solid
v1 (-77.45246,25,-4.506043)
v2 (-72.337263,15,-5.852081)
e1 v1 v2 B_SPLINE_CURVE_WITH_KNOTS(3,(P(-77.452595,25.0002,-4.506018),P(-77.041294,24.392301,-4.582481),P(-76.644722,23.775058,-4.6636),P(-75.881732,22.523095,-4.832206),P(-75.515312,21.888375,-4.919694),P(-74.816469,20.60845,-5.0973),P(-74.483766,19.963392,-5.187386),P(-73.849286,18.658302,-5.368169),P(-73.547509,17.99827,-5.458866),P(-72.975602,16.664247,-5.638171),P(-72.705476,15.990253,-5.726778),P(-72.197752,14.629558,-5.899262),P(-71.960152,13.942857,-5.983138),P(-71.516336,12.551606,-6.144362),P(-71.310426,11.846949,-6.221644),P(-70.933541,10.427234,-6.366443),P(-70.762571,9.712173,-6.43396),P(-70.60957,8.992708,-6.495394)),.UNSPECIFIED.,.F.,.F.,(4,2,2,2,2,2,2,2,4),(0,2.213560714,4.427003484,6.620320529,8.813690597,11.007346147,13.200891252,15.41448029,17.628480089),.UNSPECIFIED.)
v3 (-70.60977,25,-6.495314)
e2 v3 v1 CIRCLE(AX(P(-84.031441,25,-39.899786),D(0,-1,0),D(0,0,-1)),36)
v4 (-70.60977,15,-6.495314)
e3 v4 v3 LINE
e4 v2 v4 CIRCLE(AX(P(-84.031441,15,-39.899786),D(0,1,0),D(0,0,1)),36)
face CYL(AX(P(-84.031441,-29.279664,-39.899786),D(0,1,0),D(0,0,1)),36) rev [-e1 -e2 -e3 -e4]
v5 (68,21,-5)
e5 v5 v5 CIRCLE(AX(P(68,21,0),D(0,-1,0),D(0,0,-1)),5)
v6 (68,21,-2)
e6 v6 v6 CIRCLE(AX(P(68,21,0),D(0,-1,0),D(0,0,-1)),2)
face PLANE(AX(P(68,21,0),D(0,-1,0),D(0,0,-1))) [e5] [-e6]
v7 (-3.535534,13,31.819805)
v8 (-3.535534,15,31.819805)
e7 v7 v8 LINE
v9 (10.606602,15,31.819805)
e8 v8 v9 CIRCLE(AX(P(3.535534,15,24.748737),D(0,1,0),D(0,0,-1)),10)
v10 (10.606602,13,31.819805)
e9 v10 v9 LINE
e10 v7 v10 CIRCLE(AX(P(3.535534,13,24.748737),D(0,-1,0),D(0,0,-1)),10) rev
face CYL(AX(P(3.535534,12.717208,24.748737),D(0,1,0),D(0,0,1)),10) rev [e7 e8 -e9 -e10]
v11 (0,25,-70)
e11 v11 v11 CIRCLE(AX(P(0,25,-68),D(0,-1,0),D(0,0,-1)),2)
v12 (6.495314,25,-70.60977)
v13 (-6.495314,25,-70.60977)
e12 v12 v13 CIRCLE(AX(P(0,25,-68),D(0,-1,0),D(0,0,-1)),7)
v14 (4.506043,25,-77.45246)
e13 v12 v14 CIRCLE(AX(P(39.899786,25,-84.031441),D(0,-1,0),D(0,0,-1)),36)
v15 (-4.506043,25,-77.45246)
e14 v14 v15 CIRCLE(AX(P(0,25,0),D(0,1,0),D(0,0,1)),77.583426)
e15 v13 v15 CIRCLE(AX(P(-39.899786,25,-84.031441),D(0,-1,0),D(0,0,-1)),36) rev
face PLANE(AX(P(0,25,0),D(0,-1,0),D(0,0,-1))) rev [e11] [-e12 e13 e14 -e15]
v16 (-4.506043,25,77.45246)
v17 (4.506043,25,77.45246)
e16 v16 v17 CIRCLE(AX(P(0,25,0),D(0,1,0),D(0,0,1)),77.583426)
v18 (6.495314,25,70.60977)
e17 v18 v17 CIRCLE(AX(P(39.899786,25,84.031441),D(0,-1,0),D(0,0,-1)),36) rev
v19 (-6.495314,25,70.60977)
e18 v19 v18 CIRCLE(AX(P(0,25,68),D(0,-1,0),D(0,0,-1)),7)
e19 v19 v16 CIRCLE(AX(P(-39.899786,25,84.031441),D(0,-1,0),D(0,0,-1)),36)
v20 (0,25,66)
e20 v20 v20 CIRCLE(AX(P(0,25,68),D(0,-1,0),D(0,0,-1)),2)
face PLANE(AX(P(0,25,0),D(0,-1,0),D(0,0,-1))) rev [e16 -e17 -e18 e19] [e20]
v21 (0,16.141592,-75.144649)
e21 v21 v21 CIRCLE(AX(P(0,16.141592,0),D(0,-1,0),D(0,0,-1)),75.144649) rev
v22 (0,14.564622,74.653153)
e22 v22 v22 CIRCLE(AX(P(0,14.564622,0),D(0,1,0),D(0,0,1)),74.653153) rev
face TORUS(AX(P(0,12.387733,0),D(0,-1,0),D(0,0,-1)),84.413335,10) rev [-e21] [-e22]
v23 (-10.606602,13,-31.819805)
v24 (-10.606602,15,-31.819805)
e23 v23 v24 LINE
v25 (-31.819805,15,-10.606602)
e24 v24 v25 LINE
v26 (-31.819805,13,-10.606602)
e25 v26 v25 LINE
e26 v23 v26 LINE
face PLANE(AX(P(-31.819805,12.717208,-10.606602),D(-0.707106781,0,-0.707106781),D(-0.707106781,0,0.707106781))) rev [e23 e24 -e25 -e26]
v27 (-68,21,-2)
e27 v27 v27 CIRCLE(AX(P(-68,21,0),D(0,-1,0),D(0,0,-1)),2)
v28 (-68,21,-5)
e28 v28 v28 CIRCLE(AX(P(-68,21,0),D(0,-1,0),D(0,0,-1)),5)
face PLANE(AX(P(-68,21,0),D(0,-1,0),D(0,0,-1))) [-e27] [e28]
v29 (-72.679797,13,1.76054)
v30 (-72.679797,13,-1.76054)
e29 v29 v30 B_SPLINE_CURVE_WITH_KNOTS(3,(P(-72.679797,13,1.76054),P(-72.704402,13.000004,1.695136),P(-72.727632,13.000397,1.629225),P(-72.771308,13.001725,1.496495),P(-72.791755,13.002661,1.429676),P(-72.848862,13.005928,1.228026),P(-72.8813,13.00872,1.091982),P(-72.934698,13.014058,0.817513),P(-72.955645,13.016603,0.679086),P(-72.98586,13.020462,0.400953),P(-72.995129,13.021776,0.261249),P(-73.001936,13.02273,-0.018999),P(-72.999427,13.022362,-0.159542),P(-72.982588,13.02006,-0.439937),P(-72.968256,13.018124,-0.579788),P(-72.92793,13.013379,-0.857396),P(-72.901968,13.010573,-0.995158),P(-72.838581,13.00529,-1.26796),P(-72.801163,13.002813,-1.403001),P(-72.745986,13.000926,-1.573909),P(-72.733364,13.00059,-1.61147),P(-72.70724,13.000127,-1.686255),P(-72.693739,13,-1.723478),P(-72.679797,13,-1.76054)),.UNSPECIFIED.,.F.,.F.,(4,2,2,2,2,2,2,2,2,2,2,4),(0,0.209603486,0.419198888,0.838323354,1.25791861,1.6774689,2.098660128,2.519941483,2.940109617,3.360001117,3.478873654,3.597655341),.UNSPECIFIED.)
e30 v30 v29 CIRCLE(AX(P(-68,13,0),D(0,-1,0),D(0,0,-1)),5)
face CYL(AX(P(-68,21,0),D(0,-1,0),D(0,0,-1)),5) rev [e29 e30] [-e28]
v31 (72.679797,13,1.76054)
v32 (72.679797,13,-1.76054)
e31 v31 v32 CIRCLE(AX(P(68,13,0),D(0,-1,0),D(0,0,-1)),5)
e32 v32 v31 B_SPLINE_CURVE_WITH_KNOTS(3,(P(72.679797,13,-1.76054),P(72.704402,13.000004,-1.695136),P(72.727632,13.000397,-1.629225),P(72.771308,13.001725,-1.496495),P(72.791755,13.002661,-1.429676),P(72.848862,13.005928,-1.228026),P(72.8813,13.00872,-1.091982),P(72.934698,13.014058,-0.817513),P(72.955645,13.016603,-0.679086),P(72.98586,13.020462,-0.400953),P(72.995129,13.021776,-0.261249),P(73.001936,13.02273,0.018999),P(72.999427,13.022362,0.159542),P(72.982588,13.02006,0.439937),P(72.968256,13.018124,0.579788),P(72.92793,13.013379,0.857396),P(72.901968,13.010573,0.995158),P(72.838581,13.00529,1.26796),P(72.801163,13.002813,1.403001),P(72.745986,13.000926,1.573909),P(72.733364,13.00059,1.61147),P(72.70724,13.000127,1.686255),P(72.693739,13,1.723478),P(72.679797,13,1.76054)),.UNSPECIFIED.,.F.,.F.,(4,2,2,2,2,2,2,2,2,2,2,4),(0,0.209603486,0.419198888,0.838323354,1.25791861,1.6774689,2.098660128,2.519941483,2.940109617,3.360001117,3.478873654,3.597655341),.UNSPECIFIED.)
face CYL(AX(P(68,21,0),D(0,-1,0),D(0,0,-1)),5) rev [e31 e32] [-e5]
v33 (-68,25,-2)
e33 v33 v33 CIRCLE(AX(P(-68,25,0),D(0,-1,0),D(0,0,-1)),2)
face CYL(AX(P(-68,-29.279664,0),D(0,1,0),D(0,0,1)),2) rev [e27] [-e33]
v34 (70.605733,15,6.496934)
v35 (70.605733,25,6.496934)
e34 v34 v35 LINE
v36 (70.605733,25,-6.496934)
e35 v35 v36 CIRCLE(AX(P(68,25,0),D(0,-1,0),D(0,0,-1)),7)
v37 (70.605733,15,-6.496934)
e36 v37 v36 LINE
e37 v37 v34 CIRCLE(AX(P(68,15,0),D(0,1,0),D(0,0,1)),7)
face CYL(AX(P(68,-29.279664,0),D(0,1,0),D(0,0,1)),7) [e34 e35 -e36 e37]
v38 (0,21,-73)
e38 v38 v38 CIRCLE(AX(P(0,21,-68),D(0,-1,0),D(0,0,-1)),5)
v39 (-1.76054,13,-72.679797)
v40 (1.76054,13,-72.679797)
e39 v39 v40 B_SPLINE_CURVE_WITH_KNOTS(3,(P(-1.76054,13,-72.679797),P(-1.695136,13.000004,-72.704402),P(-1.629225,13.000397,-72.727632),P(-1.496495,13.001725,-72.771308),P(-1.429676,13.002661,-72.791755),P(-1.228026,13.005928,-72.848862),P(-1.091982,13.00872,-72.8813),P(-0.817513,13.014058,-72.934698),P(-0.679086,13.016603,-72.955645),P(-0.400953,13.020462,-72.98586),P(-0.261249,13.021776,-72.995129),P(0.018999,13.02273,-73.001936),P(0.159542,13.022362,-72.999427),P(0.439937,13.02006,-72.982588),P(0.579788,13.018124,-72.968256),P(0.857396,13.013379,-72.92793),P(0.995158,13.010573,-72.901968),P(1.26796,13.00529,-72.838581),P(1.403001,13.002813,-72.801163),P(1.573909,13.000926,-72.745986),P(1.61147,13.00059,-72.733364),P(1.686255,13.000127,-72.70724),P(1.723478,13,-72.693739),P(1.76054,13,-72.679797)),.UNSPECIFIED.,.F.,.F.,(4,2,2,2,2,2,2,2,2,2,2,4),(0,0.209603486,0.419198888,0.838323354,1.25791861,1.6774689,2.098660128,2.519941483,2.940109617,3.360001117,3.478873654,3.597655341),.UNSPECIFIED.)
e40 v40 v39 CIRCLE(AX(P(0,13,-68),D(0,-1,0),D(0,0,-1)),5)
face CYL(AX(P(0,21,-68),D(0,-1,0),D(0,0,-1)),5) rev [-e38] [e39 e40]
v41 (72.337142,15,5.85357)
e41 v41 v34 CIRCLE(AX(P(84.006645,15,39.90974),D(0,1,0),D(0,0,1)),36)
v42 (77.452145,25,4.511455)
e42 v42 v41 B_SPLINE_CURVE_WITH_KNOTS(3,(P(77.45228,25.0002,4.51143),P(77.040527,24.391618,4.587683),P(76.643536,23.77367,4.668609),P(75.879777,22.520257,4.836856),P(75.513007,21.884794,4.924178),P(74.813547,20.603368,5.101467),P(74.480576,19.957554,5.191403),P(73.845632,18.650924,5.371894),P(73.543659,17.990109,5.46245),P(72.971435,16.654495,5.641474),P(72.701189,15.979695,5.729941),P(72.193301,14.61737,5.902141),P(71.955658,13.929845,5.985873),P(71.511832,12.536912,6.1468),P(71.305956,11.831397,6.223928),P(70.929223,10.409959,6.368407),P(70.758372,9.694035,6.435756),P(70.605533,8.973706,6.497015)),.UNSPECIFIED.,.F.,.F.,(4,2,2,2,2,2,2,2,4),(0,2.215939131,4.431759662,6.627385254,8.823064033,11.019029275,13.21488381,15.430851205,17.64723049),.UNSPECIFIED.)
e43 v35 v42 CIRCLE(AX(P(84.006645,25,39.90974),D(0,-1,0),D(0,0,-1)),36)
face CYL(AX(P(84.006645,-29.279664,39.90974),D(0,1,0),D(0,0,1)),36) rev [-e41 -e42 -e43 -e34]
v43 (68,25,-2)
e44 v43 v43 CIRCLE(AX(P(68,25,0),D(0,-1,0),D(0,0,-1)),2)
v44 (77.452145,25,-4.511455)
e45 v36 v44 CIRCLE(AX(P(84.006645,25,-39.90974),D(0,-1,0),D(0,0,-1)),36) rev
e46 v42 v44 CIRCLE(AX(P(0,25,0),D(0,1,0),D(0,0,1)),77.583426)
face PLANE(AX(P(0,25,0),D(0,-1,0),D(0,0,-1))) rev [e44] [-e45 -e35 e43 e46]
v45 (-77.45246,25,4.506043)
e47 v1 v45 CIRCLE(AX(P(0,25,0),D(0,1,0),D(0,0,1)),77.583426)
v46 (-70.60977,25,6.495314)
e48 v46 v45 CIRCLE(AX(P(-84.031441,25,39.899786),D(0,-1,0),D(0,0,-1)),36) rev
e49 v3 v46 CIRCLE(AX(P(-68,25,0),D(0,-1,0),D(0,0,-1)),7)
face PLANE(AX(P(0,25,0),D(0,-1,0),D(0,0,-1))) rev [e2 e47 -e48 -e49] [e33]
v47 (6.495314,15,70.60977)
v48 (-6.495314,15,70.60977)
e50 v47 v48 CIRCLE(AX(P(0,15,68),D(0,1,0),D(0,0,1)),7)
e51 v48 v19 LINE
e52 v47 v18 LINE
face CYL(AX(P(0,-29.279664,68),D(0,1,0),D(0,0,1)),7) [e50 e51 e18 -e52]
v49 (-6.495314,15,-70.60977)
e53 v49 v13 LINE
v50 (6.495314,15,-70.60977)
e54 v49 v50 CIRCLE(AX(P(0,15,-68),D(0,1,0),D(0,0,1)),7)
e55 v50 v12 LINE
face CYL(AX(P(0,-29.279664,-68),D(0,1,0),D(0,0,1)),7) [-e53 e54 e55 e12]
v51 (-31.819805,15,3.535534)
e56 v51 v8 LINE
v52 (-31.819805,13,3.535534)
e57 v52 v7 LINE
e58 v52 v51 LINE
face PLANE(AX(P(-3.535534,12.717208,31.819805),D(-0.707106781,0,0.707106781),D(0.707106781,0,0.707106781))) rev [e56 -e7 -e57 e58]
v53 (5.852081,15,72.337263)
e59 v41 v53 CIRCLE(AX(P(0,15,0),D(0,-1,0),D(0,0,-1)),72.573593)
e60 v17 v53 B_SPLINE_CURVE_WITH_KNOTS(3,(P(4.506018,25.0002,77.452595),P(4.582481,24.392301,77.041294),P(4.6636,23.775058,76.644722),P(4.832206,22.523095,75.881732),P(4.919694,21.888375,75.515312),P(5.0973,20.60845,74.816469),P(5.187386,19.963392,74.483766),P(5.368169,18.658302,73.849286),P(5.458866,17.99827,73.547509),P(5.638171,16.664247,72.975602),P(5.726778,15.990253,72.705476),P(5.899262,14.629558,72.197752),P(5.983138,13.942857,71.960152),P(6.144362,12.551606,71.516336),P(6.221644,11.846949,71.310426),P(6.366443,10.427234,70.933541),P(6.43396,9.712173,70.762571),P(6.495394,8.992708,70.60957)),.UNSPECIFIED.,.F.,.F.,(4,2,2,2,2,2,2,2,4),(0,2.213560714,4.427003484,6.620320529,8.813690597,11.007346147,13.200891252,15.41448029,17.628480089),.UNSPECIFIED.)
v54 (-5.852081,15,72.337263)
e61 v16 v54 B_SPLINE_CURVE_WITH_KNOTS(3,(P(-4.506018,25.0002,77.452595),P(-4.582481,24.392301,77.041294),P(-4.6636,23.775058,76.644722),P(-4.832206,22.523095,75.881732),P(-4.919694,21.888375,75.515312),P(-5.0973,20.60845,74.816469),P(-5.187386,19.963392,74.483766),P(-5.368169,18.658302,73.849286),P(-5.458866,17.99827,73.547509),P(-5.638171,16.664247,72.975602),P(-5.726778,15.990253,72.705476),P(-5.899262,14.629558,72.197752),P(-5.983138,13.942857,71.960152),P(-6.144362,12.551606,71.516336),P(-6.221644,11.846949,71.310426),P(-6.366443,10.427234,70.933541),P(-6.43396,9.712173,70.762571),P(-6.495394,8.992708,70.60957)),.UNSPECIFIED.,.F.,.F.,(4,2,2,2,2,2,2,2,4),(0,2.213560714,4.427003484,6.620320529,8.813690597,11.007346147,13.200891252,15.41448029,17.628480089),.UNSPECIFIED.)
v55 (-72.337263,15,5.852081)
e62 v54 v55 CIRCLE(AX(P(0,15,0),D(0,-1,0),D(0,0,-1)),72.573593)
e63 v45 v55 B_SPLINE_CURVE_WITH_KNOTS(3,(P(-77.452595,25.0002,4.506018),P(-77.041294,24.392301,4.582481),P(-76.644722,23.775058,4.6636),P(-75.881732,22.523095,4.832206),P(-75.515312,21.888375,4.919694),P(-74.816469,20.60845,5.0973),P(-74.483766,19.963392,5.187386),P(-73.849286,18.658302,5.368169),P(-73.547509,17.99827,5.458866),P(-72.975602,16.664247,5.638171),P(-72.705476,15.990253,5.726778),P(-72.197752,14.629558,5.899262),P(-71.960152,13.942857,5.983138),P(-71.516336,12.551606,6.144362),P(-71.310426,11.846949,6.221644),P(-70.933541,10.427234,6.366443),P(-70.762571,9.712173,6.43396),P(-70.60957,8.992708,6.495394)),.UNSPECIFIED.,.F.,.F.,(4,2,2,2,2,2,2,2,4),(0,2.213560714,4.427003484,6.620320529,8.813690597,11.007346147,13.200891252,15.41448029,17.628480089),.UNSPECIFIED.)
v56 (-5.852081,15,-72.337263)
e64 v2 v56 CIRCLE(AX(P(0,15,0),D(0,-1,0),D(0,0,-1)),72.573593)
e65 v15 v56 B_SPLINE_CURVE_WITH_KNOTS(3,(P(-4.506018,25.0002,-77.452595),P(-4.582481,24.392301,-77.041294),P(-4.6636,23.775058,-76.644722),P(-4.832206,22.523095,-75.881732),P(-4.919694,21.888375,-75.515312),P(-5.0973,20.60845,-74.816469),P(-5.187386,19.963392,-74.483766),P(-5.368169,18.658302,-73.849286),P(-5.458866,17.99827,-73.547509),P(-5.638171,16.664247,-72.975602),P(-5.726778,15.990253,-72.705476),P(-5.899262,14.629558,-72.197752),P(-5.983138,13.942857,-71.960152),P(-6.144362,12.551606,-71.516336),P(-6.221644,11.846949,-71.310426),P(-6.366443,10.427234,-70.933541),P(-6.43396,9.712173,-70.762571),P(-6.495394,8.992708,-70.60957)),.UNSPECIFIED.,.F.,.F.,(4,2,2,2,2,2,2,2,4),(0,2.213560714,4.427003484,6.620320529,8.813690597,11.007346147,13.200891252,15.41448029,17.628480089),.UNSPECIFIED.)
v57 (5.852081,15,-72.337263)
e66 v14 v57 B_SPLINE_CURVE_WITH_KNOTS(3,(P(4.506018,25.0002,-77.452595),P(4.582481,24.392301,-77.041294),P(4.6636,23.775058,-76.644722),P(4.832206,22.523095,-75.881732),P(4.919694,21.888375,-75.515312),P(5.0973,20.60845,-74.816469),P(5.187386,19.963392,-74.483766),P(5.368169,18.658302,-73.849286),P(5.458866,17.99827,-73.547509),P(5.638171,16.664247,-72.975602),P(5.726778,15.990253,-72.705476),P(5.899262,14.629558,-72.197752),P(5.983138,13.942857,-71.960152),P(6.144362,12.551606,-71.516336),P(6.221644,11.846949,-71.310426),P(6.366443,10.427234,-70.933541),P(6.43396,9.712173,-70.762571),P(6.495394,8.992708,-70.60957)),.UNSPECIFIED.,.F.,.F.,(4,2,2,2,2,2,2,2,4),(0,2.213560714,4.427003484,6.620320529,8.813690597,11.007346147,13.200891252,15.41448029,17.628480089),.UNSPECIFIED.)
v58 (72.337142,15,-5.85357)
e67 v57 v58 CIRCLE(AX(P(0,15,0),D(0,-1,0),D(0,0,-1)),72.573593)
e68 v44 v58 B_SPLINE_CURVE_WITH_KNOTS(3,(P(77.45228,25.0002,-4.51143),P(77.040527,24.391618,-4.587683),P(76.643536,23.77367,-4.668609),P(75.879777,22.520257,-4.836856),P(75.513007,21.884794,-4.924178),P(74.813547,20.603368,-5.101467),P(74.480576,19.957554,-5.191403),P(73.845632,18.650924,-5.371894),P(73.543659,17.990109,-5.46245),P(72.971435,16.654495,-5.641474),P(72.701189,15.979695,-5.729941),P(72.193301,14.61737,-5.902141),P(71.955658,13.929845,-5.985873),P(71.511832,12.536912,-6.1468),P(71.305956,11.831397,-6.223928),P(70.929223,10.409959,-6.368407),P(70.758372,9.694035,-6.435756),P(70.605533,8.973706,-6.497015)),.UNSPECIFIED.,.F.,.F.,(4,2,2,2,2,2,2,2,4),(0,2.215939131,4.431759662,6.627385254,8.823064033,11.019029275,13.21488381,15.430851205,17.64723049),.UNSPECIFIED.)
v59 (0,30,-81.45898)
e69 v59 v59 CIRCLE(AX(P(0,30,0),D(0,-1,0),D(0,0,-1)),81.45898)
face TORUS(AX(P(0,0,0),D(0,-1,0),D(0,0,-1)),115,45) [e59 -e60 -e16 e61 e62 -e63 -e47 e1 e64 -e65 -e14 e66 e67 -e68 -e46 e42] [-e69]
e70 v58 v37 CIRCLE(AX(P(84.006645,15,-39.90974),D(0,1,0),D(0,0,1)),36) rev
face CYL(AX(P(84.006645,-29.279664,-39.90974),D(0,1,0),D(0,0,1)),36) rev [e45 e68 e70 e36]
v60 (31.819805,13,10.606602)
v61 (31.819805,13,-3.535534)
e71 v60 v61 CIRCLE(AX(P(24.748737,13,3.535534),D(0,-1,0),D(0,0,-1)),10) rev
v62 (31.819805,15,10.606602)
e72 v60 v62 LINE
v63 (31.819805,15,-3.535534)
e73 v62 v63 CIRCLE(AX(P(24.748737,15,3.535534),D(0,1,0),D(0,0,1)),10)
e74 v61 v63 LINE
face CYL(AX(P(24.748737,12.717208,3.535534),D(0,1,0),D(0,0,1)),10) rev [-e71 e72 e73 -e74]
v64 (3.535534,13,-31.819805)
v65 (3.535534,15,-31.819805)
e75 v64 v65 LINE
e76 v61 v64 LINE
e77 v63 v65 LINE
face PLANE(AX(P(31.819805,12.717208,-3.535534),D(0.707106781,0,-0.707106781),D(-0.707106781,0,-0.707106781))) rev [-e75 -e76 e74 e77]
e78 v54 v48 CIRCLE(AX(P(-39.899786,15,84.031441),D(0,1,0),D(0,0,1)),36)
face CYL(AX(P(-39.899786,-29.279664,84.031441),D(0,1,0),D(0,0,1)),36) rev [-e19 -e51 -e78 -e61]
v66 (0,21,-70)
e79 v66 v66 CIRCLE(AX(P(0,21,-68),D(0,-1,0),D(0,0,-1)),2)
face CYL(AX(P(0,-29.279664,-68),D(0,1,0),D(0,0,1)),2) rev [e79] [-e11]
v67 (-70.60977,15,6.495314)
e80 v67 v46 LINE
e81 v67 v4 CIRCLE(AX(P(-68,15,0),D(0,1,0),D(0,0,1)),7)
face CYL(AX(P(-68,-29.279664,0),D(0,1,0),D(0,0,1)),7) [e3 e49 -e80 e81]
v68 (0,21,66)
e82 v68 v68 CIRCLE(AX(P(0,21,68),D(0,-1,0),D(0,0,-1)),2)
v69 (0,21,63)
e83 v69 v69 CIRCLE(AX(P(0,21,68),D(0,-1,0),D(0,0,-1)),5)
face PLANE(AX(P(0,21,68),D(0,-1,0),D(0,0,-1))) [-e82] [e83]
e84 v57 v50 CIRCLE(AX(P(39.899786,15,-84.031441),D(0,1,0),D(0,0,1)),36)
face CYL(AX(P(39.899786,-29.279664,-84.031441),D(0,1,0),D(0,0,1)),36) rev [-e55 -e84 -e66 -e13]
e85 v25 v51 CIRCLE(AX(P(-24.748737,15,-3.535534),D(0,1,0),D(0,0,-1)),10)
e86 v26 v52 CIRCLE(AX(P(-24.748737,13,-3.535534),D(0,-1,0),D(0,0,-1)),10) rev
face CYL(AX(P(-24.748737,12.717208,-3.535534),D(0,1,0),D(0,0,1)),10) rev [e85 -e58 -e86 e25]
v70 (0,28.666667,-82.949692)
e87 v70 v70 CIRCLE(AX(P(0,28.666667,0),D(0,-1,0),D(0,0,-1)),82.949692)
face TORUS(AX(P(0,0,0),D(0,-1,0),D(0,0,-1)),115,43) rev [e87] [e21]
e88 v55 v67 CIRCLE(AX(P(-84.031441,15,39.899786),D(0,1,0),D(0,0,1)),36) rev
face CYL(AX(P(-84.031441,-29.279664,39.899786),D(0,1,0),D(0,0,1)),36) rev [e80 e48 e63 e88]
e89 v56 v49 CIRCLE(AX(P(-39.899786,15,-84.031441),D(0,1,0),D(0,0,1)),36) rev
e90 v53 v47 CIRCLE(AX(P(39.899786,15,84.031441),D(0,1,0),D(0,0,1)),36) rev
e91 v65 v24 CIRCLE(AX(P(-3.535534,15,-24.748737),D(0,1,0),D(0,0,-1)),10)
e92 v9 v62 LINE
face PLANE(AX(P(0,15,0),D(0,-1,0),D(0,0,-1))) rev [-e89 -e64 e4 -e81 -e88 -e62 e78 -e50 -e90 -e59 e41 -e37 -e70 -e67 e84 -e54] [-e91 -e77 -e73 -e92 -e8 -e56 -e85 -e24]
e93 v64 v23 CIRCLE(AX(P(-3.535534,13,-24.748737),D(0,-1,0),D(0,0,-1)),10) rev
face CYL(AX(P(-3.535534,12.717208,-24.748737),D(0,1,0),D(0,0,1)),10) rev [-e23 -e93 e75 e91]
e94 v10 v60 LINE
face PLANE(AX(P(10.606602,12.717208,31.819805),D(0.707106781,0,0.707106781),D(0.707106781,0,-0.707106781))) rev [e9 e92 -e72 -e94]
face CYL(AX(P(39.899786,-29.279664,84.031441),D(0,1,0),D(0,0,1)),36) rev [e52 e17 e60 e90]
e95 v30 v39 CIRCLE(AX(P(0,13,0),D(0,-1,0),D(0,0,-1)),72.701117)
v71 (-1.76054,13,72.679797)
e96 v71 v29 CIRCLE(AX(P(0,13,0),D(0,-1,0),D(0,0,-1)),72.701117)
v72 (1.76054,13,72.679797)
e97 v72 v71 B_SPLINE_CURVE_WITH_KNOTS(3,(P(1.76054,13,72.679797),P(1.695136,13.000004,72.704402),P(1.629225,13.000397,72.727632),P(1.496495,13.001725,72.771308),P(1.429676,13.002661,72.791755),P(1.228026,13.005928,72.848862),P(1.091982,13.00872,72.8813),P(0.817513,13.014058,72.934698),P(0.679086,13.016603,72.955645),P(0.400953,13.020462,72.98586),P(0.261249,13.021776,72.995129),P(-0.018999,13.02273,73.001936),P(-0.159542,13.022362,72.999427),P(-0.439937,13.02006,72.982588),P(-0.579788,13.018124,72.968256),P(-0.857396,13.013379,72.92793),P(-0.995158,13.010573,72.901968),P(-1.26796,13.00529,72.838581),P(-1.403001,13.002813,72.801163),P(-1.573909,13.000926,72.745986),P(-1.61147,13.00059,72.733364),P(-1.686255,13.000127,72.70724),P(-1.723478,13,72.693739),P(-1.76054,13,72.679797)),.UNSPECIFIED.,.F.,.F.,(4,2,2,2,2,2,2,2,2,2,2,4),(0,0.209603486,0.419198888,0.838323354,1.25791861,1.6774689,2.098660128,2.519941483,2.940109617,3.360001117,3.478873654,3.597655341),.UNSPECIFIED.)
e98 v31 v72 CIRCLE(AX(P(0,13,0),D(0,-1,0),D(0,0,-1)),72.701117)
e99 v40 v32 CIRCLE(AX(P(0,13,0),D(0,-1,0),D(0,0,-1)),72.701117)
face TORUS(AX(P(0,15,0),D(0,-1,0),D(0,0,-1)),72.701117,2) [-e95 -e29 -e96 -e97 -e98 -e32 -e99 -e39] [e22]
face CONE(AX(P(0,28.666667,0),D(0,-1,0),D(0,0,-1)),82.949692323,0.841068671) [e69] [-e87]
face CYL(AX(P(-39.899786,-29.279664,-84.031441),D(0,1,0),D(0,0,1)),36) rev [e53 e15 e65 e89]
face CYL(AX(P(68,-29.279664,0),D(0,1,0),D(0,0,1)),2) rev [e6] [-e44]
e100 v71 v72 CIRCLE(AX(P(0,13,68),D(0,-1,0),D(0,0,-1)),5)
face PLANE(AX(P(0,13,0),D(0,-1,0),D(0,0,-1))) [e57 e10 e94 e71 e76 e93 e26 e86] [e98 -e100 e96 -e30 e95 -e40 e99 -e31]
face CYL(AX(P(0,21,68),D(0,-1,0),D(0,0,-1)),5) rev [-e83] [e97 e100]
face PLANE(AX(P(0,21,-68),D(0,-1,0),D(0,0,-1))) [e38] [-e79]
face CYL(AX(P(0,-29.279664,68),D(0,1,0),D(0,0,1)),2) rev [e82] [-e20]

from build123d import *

# Parameters (mm, degrees)
BOSS_EXTRUDE1_REACH            = 121.943
SKETCH2_R                      = 2
CUT_EXTRUDE1_REACH             = 123.084
SKETCH4_W                      = 180
SKETCH4_H                      = 15
CUT_EXTRUDE1_DIRECTION_2_REACH = 123.084
SKETCH5_R                      = 74.701116641
SKETCH5_R_2                    = 2
BOSS_EXTRUDE2_DEPTH            = 2
SKETCH6_R                      = 5
CUT_EXTRUDE2_DEPTH             = 8
FILLET1_R                      = 2
FILLET2_R                      = 10
CUT_EXTRUDE3_REACH             = 120.264


with BuildPart() as part:
    # Sketch1 → Revolve-Thin1 (revolve)
    with BuildSketch(Plane.XY, mode=Mode.PRIVATE) as revolve_thin1_sk:
        with BuildLine():
            ThreePointArc((-70, 0), (-72.962243847, 16.05699404), (-81.458980338, 30))
            Line((-81.458980338, 30), (-82.949692323, 28.666666667))
            ThreePointArc((-82.949692323, 28.666666667), (-74.830588565, 15.34334986), (-72, 0))
            Line((-72, 0), (-70, 0))
        make_face()
    revolve(revolve_thin1_sk.sketch.rotate(Axis((0, 0, 0), (0, 1, 0)), 270), axis=Axis((0, 0, 0), (0, 1, 0)))

    # Boss-Extrude1: up to this face of the body (flat: up to its plane)
    boss_extrude1_end = Plane(part.part.faces().sort_by_distance((0, 0, 71.796353247))[0])
    # Sketch2 → Boss-Extrude1 (add, up to the picked face)
    with BuildSketch(Plane(origin=(0, 25, 0), x_dir=(-1, 0, 0), z_dir=(0, -1, 0)), mode=Mode.PRIVATE) as boss_extrude1_sk1:
        with BuildLine():
            ThreePointArc((6.495313924, -70.609769534), (4.324225171, -78.519680843), (4, -86.715728753))
            Line((4, -86.715728753), (-4, -86.715728753))
            ThreePointArc((-4, -86.715728753), (-4.324225171, -78.519680843), (-6.495313924, -70.609769534))
            ThreePointArc((-6.495313924, -70.609769534), (0, -61), (6.495313924, -70.609769534))
        make_face()
        with Locations(Location((0, -68, 0), (0, 0, 90))):
            Circle(SKETCH2_R, mode=Mode.SUBTRACT)
    boss_extrude1_tool1 = split(extrude(boss_extrude1_sk1.sketch, amount=BOSS_EXTRUDE1_REACH, mode=Mode.PRIVATE), bisect_by=boss_extrude1_end, keep=Keep.BOTH, mode=Mode.PRIVATE)
    # Sketch2 → Boss-Extrude1 (add, up to the picked face)
    with BuildSketch(Plane(origin=(0, 25, 0), x_dir=(-1, 0, 0), z_dir=(0, -1, 0)), mode=Mode.PRIVATE) as boss_extrude1_sk2:
        with BuildLine():
            ThreePointArc((70.609769534, 6.495313924), (78.519680843, 4.324225171), (86.715728753, 4))
            Line((86.715728753, 4), (86.715728753, -4))
            ThreePointArc((86.715728753, -4), (78.519680843, -4.324225171), (70.609769534, -6.495313924))
            ThreePointArc((70.609769534, -6.495313924), (61, 0), (70.609769534, 6.495313924))
        make_face()
        with Locations(Location((68, 0, 0), (0, 0, 90))):
            Circle(SKETCH2_R, mode=Mode.SUBTRACT)
    boss_extrude1_tool2 = split(extrude(boss_extrude1_sk2.sketch, amount=BOSS_EXTRUDE1_REACH, mode=Mode.PRIVATE), bisect_by=boss_extrude1_end, keep=Keep.BOTH, mode=Mode.PRIVATE)
    # Sketch2 → Boss-Extrude1 (add, up to the picked face)
    with BuildSketch(Plane(origin=(0, 25, 0), x_dir=(-1, 0, 0), z_dir=(0, -1, 0)), mode=Mode.PRIVATE) as boss_extrude1_sk3:
        with BuildLine():
            ThreePointArc((-6.495313924, 70.609769534), (-4.324225171, 78.519680843), (-4, 86.715728753))
            Line((-4, 86.715728753), (4, 86.715728753))
            ThreePointArc((4, 86.715728753), (4.324225171, 78.519680843), (6.495313924, 70.609769534))
            ThreePointArc((6.495313924, 70.609769534), (0, 61), (-6.495313924, 70.609769534))
        make_face()
        with Locations(Location((0, 68, 0), (0, 0, 90))):
            Circle(SKETCH2_R, mode=Mode.SUBTRACT)
    boss_extrude1_tool3 = split(extrude(boss_extrude1_sk3.sketch, amount=BOSS_EXTRUDE1_REACH, mode=Mode.PRIVATE), bisect_by=boss_extrude1_end, keep=Keep.BOTH, mode=Mode.PRIVATE)
    # Sketch2 → Boss-Extrude1 (add, up to the picked face)
    with BuildSketch(Plane(origin=(0, 25, 0), x_dir=(-1, 0, 0), z_dir=(0, -1, 0)), mode=Mode.PRIVATE) as boss_extrude1_sk4:
        with BuildLine():
            ThreePointArc((-81.360361137, 4.007132799), (-81.434321805, 2.004173085), (-81.458980338, 0))
            ThreePointArc((-81.458980338, 0), (-81.434321805, -2.004173085), (-81.360361137, -4.007132799))
            ThreePointArc((-81.360361137, -4.007132799), (-75.887045081, -4.837355971), (-70.605732867, -6.496934371))
            ThreePointArc((-70.605732867, -6.496934371), (-61, 0), (-70.605732867, 6.496934371))
            ThreePointArc((-70.605732867, 6.496934371), (-75.887045081, 4.837355971), (-81.360361137, 4.007132799))
        make_face()
        with Locations(Location((-68, 0, 0), (0, 0, 90))):
            Circle(SKETCH2_R, mode=Mode.SUBTRACT)
    boss_extrude1_tool4 = split(extrude(boss_extrude1_sk4.sketch, amount=BOSS_EXTRUDE1_REACH, mode=Mode.PRIVATE), bisect_by=boss_extrude1_end, keep=Keep.BOTH, mode=Mode.PRIVATE)
    add(boss_extrude1_tool1.solids().sort_by(Axis((0, 25, 73.20964), (0, -1, 0)))[0])
    add(boss_extrude1_tool2.solids().sort_by(Axis((-73.20964, 25, 0), (0, -1, 0)))[0])
    add(boss_extrude1_tool3.solids().sort_by(Axis((0, 25, -73.20964), (0, -1, 0)))[0])
    add(boss_extrude1_tool4.solids().sort_by(Axis((71.031369, 25, 0), (0, -1, 0)))[0])

    # Sketch3 → Cut-Revolve1 (revolve, cut)
    with BuildSketch(Plane.XY, mode=Mode.PRIVATE) as cut_revolve1_sk:
        with BuildLine():
            Line((-72, 0), (-99.127196695, 0))
            Line((-99.127196695, 0), (-99.127196695, 28.666666667))
            Line((-99.127196695, 28.666666667), (-82.949692323, 28.666666667))
            ThreePointArc((-82.949692323, 28.666666667), (-74.830588565, 15.34334986), (-72, 0))
        make_face()
    revolve(cut_revolve1_sk.sketch.rotate(Axis((0, 0, 0), (0, 1, 0)), 270), axis=Axis((0, 0, 0), (0, 1, 0)), mode=Mode.SUBTRACT)

    # Sketch4 → Cut-Extrude1 (cut, up to next)
    with BuildSketch(Plane(origin=(0, 0, 0), x_dir=(0, 0, -1), z_dir=(1, 0, 0)), mode=Mode.PRIVATE) as cut_extrude1_sk1:
        with Locations((0, 7.5)):
            Rectangle(SKETCH4_W, SKETCH4_H)
    cut_extrude1_tool1 = extrude(cut_extrude1_sk1.sketch, amount=-CUT_EXTRUDE1_REACH, mode=Mode.PRIVATE) & part.part
    add(cut_extrude1_tool1.solids().sort_by_distance((0, 7.5, 0))[0], mode=Mode.SUBTRACT)

    # Sketch4 → Cut-Extrude1 direction 2 (cut, up to next)
    with BuildSketch(Plane(origin=(0, 0, 0), x_dir=(0, 0, -1), z_dir=(1, 0, 0)), mode=Mode.PRIVATE) as cut_extrude1_direction_2_sk1:
        with Locations((0, 7.5)):
            Rectangle(SKETCH4_W, SKETCH4_H)
    cut_extrude1_direction_2_tool1 = extrude(cut_extrude1_direction_2_sk1.sketch, amount=CUT_EXTRUDE1_DIRECTION_2_REACH, mode=Mode.PRIVATE) & part.part
    add(cut_extrude1_direction_2_tool1.solids().sort_by_distance((0, 7.5, 0))[0], mode=Mode.SUBTRACT)

    # Sketch5 → Boss-Extrude2 (add)
    with BuildSketch(Plane.XZ.offset(-15)):
        with Locations(Location((0, 0, 0), (0, 0, 270))):
            Circle(SKETCH5_R)
        with Locations(Location((68, 0, 0), (0, 0, 270))):
            Circle(SKETCH5_R_2, mode=Mode.SUBTRACT)
        with Locations(Location((0, 68, 0), (0, 0, 270))):
            Circle(SKETCH5_R_2, mode=Mode.SUBTRACT)
        with Locations(Location((-68, 0, 0), (0, 0, 270))):
            Circle(SKETCH5_R_2, mode=Mode.SUBTRACT)
        with Locations(Location((0, -68, 0), (0, 0, 270))):
            Circle(SKETCH5_R_2, mode=Mode.SUBTRACT)
    extrude(amount=BOSS_EXTRUDE2_DEPTH)

    # Sketch6 → Cut-Extrude2 (cut)
    with BuildSketch(Plane.XZ.offset(-13)):
        with Locations(Location((0, 68, 0), (0, 0, 270))):
            Circle(SKETCH6_R)
        with Locations(Location((68, 0, 0), (0, 0, 270))):
            Circle(SKETCH6_R)
        with Locations(Location((0, -68, 0), (0, 0, 270))):
            Circle(SKETCH6_R)
        with Locations(Location((-68, 0, 0), (0, 0, 270))):
            Circle(SKETCH6_R)
    extrude(amount=-CUT_EXTRUDE2_DEPTH, mode=Mode.SUBTRACT)

    # Fillet1
    # the kernel refuses this fillet: 2 mm, written as the material it takes off along each edge
    with BuildSketch(Plane(origin=(0, 13, 0), x_dir=(0, 0, -1), z_dir=(-1, 0, 0))) as fillet1_piece_1:
        with BuildLine():
            CenterArc((74.701116641 - FILLET1_R, -FILLET1_R), FILLET1_R, 0, 90)
            Line((74.701116641 - FILLET1_R, 0), (74.701116641, 0))
            Line((74.701116641, 0), (74.701116641, -FILLET1_R))
        make_face()
    revolve(axis=Axis((0, 13, 0), (0, -1, 0)), mode=Mode.SUBTRACT)

    # Fillet2
    fillet2_edges = [part.edges().sort_by_distance(p)[0] for p in [
        (0, 15, 74.701116641),
    ]]
    fillet(fillet2_edges, radius=FILLET2_R)

    # Sketch7 → Cut-Extrude3 (cut, up to next)
    with BuildSketch(Plane(origin=(0, 15, 0), x_dir=(1, 0, 0), z_dir=(0, 1, 0)), mode=Mode.PRIVATE) as cut_extrude3_sk1:
        with BuildLine():
            Line((10.606601718, -31.819805153), (31.819805153, -10.606601718))
            ThreePointArc((31.819805153, -10.606601718), (34.748737342, -3.535533906), (31.819805153, 3.535533906))
            Line((31.819805153, 3.535533906), (3.535533906, 31.819805153))
            ThreePointArc((3.535533906, 31.819805153), (-3.535533906, 34.748737342), (-10.606601718, 31.819805153))
            Line((-10.606601718, 31.819805153), (-31.819805153, 10.606601718))
            ThreePointArc((-31.819805153, 10.606601718), (-34.748737342, 3.535533906), (-31.819805153, -3.535533906))
            Line((-31.819805153, -3.535533906), (-3.535533906, -31.819805153))
            ThreePointArc((-3.535533906, -31.819805153), (3.535533906, -34.748737342), (10.606601718, -31.819805153))
        make_face()
    cut_extrude3_tool1 = extrude(cut_extrude3_sk1.sketch, amount=-CUT_EXTRUDE3_REACH, mode=Mode.PRIVATE) & part.part
    add(cut_extrude3_tool1.solids().sort_by_distance((0, 15, 0))[0], mode=Mode.SUBTRACT)


solid = part.part
